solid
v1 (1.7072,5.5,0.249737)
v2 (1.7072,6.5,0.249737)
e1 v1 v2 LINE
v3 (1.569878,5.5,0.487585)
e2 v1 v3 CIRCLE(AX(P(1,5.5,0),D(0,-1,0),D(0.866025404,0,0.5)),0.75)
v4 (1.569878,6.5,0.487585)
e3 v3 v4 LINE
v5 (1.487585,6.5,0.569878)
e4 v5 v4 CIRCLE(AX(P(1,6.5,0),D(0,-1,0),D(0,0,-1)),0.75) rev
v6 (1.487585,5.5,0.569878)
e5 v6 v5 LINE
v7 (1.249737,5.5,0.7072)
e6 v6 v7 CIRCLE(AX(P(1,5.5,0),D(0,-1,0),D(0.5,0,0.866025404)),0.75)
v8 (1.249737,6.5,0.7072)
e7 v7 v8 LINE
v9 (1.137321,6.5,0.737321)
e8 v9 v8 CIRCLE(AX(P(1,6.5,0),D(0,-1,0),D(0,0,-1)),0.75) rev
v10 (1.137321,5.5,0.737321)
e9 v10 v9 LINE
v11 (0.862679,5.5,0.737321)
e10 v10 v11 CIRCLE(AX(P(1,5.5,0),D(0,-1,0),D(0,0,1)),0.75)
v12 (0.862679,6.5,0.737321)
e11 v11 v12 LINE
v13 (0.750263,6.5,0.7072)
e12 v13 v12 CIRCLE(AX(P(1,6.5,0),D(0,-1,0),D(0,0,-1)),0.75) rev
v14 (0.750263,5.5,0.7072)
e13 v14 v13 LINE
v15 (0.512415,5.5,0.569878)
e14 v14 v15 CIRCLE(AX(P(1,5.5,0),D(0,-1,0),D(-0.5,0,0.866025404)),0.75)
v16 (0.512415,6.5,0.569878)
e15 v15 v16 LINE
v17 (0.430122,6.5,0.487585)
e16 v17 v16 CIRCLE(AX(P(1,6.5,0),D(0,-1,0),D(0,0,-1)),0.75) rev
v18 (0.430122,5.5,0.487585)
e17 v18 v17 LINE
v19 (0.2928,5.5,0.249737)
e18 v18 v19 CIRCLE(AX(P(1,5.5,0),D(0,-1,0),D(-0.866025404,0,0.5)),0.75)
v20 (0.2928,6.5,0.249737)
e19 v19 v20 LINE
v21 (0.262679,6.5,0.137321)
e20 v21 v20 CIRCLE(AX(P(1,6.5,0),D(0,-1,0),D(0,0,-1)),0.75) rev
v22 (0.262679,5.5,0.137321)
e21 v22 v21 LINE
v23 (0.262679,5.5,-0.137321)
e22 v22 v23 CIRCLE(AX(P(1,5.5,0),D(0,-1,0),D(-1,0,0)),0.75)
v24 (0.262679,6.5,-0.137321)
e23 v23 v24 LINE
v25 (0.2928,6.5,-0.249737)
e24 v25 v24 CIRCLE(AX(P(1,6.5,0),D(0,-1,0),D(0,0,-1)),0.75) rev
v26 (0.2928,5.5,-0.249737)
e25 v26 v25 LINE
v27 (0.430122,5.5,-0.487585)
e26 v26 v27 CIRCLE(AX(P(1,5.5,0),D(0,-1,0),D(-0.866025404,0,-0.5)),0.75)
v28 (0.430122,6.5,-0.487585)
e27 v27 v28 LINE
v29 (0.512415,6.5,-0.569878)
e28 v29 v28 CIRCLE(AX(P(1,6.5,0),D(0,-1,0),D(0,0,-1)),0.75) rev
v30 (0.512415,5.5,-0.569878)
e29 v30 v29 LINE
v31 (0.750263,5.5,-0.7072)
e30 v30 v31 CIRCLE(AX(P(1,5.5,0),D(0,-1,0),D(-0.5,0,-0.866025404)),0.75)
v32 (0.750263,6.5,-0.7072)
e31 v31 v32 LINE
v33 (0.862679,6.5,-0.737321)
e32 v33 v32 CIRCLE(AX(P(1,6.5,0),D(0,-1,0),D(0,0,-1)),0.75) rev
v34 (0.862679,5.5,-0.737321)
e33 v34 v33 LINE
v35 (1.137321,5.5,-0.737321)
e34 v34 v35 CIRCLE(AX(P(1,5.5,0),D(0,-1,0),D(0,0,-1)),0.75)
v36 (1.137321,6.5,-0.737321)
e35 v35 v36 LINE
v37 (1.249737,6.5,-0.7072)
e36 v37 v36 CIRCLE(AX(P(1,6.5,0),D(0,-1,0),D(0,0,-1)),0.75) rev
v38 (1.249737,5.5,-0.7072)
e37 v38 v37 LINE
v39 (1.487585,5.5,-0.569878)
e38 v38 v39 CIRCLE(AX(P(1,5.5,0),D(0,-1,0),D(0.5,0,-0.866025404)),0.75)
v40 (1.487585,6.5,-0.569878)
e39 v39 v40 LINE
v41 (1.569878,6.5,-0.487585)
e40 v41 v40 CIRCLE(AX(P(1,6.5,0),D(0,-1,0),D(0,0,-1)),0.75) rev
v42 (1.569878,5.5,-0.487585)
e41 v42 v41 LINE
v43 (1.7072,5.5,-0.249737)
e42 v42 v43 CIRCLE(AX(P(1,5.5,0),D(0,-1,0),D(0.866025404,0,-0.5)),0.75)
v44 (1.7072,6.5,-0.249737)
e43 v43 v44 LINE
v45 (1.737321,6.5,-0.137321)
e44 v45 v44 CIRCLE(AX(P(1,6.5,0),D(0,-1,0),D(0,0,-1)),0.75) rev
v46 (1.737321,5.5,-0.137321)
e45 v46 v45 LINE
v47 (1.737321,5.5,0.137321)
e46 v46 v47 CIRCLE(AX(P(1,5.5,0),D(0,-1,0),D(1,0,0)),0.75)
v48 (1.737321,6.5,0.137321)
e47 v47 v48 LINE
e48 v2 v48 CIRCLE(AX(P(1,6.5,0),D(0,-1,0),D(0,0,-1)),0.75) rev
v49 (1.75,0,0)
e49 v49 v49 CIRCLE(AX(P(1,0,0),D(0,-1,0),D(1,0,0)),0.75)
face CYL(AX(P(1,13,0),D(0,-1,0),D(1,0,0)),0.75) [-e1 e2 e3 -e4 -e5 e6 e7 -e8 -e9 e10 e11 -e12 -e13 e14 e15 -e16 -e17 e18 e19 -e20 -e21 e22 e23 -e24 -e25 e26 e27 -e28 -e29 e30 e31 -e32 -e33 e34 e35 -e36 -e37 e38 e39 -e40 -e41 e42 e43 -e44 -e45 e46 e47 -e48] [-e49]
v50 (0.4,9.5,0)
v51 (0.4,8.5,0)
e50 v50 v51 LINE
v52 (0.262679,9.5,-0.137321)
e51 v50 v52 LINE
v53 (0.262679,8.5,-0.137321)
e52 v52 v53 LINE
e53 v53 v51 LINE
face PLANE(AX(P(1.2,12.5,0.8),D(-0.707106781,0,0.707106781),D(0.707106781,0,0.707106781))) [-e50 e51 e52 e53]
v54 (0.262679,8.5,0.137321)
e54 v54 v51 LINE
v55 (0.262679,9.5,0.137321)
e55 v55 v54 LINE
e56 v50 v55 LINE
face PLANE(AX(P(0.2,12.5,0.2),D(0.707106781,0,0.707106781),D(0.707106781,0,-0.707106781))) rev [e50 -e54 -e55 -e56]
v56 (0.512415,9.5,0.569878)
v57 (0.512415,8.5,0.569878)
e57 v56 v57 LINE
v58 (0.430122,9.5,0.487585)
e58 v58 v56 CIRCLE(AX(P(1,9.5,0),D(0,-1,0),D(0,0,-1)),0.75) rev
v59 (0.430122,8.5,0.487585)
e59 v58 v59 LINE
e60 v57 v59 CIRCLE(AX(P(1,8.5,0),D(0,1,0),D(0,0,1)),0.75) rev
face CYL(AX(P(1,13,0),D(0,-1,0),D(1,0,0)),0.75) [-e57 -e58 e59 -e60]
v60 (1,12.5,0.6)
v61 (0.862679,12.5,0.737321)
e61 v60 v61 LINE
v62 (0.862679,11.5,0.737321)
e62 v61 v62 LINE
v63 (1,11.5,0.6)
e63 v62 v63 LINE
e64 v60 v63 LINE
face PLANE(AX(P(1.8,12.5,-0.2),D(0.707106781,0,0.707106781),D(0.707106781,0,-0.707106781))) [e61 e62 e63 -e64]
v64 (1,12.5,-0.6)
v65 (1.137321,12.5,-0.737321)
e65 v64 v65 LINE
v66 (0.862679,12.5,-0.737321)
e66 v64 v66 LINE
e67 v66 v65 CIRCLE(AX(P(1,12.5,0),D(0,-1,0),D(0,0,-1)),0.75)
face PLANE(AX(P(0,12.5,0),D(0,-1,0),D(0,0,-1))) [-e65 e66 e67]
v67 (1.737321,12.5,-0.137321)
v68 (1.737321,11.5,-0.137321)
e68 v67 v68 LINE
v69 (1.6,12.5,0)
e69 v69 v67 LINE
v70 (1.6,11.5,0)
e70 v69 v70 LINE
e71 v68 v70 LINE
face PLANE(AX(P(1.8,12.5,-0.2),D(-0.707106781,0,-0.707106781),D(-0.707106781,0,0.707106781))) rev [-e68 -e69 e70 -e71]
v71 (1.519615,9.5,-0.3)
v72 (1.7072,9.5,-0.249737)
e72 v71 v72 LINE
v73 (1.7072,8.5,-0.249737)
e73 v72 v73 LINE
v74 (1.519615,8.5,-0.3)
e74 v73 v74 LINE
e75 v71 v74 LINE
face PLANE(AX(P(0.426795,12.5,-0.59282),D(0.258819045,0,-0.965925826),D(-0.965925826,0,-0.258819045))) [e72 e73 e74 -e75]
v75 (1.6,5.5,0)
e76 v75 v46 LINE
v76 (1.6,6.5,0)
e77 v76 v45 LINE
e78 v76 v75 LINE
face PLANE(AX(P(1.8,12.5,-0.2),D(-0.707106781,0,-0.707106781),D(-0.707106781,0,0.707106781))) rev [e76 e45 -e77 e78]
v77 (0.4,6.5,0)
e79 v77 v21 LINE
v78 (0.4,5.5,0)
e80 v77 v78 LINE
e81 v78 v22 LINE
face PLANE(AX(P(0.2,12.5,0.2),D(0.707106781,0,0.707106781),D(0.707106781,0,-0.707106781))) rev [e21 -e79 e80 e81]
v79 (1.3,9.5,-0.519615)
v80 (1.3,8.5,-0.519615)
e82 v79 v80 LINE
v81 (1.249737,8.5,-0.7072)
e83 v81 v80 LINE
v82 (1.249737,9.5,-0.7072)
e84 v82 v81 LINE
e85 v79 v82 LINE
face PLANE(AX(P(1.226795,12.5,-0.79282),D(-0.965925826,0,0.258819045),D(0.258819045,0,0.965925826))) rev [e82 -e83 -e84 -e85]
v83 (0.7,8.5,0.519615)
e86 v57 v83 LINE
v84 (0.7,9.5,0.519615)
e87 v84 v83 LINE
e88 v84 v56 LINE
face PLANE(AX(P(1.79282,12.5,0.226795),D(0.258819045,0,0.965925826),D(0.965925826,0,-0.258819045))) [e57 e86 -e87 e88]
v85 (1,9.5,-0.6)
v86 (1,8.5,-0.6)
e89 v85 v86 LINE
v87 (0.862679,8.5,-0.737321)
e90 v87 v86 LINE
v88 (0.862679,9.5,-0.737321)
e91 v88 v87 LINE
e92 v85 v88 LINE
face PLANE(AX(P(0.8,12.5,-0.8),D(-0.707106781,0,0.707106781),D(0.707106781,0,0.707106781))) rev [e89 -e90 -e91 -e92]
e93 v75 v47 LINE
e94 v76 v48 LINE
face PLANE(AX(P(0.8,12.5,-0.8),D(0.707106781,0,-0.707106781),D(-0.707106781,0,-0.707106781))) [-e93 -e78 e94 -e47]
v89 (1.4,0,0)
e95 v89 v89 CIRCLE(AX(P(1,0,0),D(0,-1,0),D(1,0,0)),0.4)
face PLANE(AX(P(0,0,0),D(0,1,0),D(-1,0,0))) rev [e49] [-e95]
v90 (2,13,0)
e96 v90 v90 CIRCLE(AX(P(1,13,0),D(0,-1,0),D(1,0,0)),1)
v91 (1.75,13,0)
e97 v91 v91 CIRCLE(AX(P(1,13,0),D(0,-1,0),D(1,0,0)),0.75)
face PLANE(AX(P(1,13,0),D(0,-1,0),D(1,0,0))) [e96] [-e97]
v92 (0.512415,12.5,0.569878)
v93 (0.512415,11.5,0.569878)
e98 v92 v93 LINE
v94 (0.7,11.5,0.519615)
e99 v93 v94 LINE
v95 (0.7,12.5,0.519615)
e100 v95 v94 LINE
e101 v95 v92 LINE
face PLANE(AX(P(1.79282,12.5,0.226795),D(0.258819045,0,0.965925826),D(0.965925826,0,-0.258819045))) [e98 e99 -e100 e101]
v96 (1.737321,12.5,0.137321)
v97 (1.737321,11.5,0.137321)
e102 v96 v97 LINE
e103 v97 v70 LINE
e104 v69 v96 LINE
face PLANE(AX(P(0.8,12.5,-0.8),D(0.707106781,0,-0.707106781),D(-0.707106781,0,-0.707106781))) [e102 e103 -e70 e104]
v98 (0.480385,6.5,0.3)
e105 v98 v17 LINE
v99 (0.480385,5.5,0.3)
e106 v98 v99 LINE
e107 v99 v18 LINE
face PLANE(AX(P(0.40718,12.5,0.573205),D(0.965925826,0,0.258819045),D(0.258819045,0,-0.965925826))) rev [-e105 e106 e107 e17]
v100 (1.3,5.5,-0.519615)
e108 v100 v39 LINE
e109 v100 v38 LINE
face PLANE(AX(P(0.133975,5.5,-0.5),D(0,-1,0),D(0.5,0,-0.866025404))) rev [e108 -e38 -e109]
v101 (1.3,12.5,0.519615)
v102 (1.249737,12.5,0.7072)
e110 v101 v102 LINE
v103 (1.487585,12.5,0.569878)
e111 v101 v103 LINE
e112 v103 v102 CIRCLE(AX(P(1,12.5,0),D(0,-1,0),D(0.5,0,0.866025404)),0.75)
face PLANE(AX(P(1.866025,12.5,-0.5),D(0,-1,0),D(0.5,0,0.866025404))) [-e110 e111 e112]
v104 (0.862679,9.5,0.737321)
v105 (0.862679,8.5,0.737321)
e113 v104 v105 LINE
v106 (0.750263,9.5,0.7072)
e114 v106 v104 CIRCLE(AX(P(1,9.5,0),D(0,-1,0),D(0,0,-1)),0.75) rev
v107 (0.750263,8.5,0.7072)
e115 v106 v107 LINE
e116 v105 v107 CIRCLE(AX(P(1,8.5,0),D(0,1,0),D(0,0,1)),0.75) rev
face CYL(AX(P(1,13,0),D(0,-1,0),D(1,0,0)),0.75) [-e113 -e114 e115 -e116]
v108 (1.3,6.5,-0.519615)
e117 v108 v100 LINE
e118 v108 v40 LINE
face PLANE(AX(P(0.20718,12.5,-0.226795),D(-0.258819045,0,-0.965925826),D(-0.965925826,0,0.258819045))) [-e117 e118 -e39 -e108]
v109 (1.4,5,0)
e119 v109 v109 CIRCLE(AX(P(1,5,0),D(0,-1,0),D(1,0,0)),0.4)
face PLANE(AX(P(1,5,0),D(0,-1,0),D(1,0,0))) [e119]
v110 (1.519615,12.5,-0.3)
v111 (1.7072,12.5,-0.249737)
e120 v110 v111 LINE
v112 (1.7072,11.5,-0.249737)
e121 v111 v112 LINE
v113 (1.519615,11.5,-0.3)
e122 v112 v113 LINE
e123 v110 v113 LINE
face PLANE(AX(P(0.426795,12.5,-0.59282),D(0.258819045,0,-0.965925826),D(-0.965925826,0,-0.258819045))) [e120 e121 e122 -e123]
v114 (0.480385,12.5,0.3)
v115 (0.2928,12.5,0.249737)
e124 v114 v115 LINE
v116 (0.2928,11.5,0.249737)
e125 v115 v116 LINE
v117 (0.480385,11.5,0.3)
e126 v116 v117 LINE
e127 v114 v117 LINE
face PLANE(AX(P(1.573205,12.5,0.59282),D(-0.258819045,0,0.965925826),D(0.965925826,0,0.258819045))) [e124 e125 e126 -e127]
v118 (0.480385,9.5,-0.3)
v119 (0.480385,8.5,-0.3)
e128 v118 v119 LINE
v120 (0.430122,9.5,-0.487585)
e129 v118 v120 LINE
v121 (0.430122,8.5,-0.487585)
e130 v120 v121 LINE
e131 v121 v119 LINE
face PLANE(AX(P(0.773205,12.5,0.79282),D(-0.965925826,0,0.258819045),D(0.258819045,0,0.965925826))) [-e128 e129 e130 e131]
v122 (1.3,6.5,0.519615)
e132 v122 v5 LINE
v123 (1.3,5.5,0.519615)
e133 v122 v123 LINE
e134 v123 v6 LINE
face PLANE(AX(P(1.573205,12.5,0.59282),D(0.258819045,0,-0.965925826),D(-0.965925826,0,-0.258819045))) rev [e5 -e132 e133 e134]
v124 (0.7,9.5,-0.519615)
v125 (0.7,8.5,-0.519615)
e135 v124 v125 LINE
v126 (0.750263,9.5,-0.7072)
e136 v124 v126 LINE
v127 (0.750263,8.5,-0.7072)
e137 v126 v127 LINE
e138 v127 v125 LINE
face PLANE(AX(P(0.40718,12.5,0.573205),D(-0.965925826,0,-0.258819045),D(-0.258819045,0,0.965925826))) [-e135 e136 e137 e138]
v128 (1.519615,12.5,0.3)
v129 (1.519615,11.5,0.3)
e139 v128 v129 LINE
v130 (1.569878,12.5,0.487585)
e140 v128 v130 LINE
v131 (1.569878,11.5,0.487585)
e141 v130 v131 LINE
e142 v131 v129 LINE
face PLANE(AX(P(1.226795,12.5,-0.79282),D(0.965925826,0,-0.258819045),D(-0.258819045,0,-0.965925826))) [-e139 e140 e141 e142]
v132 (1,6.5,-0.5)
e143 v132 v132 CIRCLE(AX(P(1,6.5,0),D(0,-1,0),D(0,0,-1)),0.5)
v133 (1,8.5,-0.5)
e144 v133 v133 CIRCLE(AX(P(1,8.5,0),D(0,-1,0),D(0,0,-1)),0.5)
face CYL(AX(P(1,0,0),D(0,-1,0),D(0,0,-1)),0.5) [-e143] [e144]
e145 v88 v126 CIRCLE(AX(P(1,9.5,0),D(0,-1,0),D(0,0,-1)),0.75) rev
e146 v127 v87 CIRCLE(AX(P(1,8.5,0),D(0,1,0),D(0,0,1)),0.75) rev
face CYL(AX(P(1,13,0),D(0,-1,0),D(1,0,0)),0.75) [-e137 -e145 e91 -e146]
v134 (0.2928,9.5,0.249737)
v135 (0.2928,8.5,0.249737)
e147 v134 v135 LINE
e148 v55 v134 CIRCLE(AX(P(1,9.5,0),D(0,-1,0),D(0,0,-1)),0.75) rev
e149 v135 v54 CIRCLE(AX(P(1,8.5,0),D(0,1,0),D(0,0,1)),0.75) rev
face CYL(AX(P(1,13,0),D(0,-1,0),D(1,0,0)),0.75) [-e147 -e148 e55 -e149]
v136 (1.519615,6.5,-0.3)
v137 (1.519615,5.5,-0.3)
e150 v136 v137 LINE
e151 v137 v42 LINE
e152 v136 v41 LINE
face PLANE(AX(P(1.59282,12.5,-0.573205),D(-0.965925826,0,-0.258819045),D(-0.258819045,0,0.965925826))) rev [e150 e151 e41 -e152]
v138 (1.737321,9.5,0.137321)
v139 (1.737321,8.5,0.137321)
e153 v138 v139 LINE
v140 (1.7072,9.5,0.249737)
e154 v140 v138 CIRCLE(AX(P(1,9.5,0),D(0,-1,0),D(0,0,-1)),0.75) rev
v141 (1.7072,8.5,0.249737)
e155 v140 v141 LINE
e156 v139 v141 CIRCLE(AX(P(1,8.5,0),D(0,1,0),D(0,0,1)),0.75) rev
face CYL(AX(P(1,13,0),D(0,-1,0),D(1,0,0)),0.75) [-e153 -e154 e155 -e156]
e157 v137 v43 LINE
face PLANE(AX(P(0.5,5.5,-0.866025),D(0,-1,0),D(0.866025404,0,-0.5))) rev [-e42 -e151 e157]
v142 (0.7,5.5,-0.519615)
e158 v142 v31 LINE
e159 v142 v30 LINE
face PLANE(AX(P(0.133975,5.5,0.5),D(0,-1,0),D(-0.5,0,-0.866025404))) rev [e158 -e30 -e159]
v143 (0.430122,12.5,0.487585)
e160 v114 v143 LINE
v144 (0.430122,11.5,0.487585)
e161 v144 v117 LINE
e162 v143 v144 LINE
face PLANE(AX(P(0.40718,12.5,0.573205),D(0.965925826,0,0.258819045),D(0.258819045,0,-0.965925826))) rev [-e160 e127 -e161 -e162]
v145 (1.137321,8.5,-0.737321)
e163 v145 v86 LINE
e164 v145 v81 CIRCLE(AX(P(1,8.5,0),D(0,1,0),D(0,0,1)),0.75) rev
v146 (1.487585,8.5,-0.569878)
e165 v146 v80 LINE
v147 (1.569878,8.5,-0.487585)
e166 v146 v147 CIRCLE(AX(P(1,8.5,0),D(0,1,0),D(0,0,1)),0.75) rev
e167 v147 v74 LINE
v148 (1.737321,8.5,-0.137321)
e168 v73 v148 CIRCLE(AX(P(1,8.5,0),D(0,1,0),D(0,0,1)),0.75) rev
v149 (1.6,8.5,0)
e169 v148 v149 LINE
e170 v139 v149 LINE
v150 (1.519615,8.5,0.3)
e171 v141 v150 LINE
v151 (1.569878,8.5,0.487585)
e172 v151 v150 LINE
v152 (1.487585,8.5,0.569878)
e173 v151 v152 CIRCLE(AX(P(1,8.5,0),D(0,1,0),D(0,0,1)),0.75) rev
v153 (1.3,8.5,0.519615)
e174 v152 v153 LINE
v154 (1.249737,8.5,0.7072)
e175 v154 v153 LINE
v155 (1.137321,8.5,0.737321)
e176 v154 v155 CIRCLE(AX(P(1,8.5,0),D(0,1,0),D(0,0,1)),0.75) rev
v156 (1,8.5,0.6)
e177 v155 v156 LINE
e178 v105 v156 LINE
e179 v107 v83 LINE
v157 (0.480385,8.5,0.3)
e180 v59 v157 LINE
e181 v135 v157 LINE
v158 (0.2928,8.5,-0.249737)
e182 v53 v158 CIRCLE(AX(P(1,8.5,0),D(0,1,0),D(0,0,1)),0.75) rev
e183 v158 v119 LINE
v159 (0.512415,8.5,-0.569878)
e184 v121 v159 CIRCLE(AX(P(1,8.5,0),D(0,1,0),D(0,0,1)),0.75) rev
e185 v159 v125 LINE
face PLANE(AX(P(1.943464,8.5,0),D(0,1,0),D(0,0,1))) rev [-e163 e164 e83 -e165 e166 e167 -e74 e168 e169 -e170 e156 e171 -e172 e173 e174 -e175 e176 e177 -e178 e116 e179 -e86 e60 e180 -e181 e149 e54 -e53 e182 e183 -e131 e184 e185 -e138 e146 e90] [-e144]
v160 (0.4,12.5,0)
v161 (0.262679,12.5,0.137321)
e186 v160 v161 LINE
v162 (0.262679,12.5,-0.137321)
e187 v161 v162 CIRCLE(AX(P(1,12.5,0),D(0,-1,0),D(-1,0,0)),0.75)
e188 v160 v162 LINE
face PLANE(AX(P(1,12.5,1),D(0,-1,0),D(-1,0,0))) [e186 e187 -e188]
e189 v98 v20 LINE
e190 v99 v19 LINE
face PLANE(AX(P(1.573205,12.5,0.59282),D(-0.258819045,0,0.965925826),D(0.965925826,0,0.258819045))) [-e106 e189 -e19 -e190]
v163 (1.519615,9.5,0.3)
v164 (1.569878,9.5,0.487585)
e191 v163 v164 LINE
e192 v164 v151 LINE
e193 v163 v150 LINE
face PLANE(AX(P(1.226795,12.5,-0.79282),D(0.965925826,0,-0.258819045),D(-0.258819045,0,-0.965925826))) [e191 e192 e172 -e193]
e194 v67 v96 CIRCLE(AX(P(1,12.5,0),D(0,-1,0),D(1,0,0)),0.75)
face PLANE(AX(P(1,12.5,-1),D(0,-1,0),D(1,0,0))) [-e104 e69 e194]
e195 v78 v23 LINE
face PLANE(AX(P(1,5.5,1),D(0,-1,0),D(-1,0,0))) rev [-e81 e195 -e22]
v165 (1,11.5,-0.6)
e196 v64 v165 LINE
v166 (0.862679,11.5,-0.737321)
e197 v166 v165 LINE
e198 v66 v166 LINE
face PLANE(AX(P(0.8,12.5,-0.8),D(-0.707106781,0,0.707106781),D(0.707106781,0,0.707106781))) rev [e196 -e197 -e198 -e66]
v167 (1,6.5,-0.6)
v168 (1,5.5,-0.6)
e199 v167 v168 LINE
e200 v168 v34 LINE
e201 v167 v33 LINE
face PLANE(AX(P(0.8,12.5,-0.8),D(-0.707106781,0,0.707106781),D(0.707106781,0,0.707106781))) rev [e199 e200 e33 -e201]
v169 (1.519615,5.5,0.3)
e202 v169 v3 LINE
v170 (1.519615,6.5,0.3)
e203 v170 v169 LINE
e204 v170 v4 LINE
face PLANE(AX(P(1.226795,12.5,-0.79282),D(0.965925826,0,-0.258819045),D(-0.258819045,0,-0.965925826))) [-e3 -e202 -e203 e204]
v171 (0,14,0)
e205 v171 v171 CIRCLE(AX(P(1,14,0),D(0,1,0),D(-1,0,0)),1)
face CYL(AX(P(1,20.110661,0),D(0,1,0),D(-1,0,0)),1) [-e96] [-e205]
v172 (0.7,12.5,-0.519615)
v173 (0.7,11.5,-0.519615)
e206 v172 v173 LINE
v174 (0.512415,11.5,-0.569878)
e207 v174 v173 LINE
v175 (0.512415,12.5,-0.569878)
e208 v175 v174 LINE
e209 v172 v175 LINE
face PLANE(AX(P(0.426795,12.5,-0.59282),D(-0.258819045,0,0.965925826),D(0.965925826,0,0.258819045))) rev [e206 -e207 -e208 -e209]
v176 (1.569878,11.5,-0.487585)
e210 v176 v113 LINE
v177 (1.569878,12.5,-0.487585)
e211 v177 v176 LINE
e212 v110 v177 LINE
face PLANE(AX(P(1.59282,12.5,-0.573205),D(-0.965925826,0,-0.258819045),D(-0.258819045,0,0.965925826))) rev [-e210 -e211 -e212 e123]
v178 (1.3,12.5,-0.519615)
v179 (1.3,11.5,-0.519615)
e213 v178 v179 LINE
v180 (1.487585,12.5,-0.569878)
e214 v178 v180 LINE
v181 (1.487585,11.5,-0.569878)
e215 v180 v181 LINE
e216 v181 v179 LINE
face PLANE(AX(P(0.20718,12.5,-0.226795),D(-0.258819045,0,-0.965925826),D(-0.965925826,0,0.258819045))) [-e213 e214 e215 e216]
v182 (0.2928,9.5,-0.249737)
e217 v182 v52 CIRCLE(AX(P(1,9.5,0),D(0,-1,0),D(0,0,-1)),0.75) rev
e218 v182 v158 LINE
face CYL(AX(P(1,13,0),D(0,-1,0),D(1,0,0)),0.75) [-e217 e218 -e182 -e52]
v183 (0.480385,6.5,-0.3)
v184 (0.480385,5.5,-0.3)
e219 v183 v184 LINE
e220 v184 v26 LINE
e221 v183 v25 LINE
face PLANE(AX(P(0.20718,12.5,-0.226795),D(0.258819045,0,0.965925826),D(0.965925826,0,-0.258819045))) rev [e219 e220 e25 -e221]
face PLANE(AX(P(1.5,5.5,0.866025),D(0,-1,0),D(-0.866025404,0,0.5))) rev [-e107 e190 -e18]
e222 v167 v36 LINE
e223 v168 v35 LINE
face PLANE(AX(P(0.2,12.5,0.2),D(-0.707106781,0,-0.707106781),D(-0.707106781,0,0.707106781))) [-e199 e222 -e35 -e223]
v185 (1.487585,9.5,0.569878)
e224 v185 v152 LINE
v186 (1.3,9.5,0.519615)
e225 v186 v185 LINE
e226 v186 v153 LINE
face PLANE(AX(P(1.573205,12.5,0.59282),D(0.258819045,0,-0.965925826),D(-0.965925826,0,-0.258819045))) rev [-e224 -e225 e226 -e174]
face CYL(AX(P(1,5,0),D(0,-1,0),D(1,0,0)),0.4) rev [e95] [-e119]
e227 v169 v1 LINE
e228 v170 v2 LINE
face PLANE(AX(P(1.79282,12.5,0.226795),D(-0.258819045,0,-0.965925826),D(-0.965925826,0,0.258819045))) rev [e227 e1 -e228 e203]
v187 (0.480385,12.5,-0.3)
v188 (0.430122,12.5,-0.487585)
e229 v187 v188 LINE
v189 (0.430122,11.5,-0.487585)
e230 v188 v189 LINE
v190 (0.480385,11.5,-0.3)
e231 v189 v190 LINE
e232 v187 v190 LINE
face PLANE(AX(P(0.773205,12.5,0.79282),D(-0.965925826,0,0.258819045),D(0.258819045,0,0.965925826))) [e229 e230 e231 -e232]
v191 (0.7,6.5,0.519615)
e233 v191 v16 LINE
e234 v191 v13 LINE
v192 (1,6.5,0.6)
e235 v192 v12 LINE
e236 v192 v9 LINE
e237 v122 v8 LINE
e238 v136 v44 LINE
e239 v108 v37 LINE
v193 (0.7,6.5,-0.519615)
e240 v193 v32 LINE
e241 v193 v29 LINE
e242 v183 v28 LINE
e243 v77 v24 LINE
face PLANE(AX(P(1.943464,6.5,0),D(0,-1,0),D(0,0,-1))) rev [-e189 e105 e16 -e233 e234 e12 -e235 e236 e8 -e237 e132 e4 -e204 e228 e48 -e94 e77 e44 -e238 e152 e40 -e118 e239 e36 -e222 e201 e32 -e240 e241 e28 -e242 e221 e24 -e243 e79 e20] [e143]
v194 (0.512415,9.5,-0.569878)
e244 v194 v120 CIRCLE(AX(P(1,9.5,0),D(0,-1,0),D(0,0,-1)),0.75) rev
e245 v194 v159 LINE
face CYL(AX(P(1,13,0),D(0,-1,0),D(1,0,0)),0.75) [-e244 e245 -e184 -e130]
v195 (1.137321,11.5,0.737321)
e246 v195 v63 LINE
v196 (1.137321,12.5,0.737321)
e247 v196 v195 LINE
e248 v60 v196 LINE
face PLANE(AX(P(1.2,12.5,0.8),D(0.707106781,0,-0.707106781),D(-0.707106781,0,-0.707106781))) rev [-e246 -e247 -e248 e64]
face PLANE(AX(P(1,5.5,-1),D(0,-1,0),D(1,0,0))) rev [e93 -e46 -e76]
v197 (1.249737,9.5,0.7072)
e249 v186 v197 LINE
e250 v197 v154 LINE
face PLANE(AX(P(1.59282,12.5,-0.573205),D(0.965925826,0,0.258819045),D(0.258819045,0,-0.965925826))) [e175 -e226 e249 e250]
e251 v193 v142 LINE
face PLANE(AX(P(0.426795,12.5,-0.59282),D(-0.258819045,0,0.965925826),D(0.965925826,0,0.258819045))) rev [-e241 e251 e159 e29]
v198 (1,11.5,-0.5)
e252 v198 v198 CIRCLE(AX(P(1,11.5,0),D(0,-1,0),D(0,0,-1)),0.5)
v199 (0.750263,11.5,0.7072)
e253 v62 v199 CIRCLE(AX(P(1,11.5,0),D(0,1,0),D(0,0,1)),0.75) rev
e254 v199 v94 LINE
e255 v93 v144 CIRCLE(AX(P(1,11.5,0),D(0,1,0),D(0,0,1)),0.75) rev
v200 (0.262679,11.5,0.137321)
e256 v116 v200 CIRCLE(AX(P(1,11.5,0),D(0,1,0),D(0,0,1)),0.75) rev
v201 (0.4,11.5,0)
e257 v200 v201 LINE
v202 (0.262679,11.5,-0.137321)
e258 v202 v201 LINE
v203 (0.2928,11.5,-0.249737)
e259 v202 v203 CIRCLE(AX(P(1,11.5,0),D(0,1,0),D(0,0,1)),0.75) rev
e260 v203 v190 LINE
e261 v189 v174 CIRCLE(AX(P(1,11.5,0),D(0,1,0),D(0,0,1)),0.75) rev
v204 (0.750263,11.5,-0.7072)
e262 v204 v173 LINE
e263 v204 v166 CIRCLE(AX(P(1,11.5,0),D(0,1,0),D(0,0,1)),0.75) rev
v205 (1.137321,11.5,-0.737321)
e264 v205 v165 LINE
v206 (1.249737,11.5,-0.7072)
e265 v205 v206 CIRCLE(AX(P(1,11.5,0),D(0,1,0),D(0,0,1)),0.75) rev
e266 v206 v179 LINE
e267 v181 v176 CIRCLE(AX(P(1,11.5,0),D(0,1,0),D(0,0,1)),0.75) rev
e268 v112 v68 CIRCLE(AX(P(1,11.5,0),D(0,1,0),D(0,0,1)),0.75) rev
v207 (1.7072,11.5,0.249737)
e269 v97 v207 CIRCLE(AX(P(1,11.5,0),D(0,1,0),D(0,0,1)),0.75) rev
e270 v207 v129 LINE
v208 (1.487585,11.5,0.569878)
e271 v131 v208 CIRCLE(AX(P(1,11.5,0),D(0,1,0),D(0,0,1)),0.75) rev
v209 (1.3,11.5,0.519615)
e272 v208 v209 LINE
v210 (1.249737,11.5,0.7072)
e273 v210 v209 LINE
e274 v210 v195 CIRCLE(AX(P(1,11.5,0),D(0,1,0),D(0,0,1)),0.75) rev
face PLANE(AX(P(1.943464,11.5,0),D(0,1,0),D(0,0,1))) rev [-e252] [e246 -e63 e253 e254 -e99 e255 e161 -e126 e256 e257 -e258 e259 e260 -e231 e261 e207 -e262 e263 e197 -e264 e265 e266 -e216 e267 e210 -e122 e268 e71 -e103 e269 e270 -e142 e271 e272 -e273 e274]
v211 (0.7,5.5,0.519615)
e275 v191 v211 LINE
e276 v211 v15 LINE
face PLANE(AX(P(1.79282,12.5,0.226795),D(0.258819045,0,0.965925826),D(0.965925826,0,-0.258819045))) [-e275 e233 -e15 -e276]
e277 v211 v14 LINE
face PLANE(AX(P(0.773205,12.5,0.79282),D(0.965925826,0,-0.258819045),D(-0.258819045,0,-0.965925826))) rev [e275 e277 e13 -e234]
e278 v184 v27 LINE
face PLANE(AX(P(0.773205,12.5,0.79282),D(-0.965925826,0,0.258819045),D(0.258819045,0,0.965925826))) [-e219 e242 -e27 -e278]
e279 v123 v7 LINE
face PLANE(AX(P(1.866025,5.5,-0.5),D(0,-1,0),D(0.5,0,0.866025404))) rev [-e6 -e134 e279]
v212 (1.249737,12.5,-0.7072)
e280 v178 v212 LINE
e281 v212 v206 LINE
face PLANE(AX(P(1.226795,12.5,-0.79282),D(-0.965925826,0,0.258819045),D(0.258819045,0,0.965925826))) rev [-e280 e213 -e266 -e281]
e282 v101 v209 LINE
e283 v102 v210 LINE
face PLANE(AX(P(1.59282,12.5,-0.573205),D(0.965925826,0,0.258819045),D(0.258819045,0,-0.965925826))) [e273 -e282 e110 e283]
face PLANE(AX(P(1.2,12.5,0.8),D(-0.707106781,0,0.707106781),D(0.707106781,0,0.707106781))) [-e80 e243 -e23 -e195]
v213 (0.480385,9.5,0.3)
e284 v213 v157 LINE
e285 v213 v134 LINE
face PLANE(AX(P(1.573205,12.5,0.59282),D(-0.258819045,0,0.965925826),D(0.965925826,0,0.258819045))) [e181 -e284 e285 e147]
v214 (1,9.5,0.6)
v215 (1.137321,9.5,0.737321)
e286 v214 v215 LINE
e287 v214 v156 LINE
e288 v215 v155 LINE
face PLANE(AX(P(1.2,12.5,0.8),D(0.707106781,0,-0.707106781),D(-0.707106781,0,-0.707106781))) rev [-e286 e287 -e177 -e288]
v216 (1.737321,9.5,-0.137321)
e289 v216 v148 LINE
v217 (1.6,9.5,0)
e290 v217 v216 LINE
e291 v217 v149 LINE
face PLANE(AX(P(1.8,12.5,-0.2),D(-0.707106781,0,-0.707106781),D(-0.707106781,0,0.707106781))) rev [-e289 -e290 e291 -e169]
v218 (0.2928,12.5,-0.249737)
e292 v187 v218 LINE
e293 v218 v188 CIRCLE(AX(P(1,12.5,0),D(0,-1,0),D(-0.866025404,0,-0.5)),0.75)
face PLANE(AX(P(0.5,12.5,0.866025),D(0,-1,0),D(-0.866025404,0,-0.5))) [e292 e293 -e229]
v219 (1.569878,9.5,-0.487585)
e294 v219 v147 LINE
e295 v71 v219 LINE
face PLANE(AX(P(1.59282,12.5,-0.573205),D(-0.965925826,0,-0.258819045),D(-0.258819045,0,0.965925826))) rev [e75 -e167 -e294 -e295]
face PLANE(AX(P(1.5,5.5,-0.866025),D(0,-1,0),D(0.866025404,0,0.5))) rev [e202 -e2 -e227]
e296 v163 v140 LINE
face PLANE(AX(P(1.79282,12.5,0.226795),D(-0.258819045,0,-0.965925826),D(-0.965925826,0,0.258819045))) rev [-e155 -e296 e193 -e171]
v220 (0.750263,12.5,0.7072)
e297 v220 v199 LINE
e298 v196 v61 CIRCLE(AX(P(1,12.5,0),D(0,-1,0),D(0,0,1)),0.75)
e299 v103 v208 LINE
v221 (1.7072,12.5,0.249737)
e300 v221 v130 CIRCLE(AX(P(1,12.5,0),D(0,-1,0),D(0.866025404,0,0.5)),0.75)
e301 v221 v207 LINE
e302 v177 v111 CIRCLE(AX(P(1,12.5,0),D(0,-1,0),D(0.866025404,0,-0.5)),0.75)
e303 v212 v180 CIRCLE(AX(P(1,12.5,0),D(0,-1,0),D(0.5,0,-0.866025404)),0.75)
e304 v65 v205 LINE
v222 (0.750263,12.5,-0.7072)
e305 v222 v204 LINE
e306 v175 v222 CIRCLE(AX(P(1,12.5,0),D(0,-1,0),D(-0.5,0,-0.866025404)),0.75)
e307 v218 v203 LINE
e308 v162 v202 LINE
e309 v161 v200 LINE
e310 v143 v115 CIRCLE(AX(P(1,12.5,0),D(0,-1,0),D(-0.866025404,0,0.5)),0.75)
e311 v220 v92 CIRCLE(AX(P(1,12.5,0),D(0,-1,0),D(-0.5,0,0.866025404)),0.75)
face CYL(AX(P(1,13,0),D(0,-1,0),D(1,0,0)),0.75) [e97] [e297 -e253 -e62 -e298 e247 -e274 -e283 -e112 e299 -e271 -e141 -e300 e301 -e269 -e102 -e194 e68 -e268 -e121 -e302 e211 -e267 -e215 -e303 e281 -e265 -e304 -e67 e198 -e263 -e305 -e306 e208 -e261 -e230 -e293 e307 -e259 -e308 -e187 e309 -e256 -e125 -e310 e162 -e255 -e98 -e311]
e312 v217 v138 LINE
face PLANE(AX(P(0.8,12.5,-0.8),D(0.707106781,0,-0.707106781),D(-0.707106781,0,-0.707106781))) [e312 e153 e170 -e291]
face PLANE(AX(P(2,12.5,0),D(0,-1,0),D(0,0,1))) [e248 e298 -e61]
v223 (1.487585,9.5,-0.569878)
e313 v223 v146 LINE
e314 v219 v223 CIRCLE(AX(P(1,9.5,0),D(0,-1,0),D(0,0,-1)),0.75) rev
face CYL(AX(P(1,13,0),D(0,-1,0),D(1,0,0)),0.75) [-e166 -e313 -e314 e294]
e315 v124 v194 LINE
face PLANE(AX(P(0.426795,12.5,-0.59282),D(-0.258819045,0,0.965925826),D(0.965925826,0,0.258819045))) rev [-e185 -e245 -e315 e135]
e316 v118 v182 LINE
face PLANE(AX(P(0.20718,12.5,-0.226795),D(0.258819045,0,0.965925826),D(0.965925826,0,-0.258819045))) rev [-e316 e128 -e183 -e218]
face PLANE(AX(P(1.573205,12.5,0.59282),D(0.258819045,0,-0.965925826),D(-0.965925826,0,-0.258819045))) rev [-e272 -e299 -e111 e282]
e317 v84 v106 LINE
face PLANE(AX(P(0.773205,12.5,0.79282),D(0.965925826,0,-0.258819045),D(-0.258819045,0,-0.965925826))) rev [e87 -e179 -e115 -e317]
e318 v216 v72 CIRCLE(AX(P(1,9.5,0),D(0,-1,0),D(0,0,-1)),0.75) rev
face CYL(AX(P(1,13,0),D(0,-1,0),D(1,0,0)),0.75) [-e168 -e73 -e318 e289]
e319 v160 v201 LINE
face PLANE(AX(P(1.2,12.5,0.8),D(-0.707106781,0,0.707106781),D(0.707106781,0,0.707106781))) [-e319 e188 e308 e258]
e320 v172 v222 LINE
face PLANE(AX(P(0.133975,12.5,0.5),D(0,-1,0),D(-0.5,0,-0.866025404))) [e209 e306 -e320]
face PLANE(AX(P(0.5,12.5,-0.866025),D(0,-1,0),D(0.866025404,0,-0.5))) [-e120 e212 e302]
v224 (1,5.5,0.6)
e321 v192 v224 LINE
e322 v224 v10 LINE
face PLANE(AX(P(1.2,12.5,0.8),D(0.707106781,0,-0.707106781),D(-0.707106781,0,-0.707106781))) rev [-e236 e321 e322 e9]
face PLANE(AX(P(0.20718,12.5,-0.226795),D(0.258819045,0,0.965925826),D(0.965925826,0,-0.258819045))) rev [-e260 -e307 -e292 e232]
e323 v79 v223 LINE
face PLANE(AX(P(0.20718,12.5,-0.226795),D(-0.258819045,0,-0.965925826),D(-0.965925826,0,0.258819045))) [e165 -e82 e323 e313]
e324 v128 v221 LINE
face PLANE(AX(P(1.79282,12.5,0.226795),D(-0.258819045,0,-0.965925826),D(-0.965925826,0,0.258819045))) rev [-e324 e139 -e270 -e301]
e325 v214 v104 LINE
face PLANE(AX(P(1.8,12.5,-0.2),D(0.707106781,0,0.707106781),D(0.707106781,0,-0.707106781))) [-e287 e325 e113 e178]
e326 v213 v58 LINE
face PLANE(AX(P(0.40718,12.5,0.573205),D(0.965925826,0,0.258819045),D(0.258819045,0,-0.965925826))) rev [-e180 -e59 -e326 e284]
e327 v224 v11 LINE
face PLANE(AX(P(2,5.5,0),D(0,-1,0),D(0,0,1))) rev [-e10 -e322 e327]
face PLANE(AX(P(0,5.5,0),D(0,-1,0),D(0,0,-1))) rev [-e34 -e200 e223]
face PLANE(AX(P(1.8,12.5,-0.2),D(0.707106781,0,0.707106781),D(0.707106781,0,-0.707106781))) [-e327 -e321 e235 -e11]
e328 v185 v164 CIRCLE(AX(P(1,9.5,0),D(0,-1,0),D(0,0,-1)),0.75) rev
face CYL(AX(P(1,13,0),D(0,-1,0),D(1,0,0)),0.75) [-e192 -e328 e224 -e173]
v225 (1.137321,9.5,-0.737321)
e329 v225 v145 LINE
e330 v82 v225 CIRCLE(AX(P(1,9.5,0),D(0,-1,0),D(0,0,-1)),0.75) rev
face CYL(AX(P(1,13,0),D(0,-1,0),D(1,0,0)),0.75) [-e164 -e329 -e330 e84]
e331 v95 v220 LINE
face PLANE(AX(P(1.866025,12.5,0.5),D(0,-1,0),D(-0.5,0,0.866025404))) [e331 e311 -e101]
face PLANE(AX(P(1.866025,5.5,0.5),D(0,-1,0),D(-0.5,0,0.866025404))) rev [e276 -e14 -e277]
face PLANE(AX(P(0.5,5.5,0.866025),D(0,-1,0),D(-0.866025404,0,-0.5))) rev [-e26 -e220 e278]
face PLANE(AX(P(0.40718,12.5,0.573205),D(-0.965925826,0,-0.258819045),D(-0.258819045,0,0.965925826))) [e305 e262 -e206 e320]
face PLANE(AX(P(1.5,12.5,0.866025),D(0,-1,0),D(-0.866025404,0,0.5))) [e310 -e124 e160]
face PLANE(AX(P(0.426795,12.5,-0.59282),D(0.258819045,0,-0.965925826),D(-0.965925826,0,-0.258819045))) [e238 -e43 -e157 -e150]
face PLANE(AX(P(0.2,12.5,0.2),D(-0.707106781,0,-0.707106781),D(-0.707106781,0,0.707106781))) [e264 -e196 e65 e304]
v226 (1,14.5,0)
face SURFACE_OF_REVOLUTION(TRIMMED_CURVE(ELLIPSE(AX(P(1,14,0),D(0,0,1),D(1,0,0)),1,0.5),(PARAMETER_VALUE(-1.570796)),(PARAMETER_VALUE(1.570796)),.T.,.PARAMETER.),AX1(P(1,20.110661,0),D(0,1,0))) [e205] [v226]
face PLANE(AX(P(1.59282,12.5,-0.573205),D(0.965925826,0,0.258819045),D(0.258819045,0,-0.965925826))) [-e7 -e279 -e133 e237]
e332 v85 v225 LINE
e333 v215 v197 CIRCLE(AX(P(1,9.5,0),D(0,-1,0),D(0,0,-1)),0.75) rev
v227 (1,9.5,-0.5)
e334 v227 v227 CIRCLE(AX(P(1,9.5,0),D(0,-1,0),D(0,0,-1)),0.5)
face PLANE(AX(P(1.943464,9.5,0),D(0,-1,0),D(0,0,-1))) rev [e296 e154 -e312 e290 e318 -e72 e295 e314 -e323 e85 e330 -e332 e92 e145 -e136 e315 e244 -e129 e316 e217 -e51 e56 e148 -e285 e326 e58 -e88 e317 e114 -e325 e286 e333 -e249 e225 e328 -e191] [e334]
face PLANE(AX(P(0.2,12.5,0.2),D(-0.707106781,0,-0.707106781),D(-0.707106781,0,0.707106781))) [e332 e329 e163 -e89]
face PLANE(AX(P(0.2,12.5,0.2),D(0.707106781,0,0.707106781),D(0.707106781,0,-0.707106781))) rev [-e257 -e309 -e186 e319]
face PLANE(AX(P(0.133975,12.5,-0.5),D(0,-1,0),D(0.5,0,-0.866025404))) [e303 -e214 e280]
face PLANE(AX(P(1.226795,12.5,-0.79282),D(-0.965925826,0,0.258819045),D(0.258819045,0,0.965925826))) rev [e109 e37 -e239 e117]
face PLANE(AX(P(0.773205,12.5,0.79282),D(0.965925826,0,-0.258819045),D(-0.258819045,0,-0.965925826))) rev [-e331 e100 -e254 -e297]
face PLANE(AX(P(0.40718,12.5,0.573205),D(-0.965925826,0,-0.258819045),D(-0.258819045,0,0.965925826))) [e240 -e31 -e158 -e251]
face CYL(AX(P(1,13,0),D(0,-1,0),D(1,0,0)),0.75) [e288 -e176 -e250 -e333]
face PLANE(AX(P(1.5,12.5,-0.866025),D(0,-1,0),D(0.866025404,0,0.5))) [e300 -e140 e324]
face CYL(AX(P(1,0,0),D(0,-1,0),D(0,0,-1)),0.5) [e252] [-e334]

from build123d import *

# Parameters (mm, degrees)
SKETCH_2_R                = 1.288183927
SKETCH_2_R_2              = 0.75
CUT_EXTRUDE_1_DEPTH       = 13
SKETCH_3_R                = 0.4
CUT_EXTRUDE_2_DEPTH       = 5
SKETCH_8_W                = 0.443463538
SKETCH_8_H                = 2
CUT_EXTRUDE_3_DEPTH       = 7
PATTERN_CIRCULAR_13_COUNT = 12


with BuildPart() as part:
    # 草图1 → 旋转1 (revolve)
    with BuildSketch(Plane.XY):
        with BuildLine():
            Line((1, 0), (2, 0))
            Line((2, 0), (2, 14))
            add(Edge.make_bspline(
                [(2, 14), (2, 14.5), (1, 14.5)],
                knots=[0, 0, 0, 1.570796327, 1.570796327, 1.570796327], degree=2, weights=[1, 0.707106781, 1]))
            Line((1, 14.5), (1, 0))
        make_face()
    revolve(axis=Axis((1, 20.110661338, 0), (0, -1, 0)))

    # 草图2 → 切除-拉伸1 (cut)
    with BuildSketch(Plane.XZ):
        with Locations((1, 0)):
            Circle(SKETCH_2_R)
        with Locations((1, 0)):
            Circle(SKETCH_2_R_2, mode=Mode.SUBTRACT)
    extrude(amount=-CUT_EXTRUDE_1_DEPTH, mode=Mode.SUBTRACT)

    # 草图3 → 切除-拉伸2 (cut)
    with BuildSketch(Plane(origin=(0, 0, 0), x_dir=(-1, 0, 0), z_dir=(0, -1, 0))):
        with Locations((-1, 0)):
            Circle(SKETCH_3_R)
    extrude(amount=-CUT_EXTRUDE_2_DEPTH, mode=Mode.SUBTRACT)

    # 草图8 → 切除-旋转1 (revolve, cut)
    with BuildSketch(Plane.XY):
        with Locations((1.721731769, 10.5)):
            Rectangle(SKETCH_8_W, SKETCH_8_H)
        with Locations((1.721731769, 7.5)):
            Rectangle(SKETCH_8_W, SKETCH_8_H)
    revolve(axis=Axis((1, 0, 0), (0, 1, 0)), mode=Mode.SUBTRACT)

    # 草图9 → 切除-拉伸3 (cut)
    with BuildSketch(Plane(origin=(0, 5.5, 0), x_dir=(-1, 0, 0), z_dir=(0, -1, 0))):
        with BuildLine():
            Line((-1.137321392, 0.737321392), (-1, 0.6))
            Line((-1, 0.6), (-0.862678608, 0.737321392))
            ThreePointArc((-0.862678608, 0.737321392), (-1, 0.75), (-1.137321392, 0.737321392))
        make_face()
    cut_extrude_3 = extrude(amount=-CUT_EXTRUDE_3_DEPTH, mode=Mode.SUBTRACT)

    # 阵列(圆周)13: 切除-拉伸3 ×12 about axis
    pattern_circular_13_axis = Axis((1, 13, 0), (0, -1, 0))
    for i in range(1, PATTERN_CIRCULAR_13_COUNT):
        add(cut_extrude_3.rotate(pattern_circular_13_axis, i * 360 / PATTERN_CIRCULAR_13_COUNT), mode=Mode.SUBTRACT)


solid = part.part
